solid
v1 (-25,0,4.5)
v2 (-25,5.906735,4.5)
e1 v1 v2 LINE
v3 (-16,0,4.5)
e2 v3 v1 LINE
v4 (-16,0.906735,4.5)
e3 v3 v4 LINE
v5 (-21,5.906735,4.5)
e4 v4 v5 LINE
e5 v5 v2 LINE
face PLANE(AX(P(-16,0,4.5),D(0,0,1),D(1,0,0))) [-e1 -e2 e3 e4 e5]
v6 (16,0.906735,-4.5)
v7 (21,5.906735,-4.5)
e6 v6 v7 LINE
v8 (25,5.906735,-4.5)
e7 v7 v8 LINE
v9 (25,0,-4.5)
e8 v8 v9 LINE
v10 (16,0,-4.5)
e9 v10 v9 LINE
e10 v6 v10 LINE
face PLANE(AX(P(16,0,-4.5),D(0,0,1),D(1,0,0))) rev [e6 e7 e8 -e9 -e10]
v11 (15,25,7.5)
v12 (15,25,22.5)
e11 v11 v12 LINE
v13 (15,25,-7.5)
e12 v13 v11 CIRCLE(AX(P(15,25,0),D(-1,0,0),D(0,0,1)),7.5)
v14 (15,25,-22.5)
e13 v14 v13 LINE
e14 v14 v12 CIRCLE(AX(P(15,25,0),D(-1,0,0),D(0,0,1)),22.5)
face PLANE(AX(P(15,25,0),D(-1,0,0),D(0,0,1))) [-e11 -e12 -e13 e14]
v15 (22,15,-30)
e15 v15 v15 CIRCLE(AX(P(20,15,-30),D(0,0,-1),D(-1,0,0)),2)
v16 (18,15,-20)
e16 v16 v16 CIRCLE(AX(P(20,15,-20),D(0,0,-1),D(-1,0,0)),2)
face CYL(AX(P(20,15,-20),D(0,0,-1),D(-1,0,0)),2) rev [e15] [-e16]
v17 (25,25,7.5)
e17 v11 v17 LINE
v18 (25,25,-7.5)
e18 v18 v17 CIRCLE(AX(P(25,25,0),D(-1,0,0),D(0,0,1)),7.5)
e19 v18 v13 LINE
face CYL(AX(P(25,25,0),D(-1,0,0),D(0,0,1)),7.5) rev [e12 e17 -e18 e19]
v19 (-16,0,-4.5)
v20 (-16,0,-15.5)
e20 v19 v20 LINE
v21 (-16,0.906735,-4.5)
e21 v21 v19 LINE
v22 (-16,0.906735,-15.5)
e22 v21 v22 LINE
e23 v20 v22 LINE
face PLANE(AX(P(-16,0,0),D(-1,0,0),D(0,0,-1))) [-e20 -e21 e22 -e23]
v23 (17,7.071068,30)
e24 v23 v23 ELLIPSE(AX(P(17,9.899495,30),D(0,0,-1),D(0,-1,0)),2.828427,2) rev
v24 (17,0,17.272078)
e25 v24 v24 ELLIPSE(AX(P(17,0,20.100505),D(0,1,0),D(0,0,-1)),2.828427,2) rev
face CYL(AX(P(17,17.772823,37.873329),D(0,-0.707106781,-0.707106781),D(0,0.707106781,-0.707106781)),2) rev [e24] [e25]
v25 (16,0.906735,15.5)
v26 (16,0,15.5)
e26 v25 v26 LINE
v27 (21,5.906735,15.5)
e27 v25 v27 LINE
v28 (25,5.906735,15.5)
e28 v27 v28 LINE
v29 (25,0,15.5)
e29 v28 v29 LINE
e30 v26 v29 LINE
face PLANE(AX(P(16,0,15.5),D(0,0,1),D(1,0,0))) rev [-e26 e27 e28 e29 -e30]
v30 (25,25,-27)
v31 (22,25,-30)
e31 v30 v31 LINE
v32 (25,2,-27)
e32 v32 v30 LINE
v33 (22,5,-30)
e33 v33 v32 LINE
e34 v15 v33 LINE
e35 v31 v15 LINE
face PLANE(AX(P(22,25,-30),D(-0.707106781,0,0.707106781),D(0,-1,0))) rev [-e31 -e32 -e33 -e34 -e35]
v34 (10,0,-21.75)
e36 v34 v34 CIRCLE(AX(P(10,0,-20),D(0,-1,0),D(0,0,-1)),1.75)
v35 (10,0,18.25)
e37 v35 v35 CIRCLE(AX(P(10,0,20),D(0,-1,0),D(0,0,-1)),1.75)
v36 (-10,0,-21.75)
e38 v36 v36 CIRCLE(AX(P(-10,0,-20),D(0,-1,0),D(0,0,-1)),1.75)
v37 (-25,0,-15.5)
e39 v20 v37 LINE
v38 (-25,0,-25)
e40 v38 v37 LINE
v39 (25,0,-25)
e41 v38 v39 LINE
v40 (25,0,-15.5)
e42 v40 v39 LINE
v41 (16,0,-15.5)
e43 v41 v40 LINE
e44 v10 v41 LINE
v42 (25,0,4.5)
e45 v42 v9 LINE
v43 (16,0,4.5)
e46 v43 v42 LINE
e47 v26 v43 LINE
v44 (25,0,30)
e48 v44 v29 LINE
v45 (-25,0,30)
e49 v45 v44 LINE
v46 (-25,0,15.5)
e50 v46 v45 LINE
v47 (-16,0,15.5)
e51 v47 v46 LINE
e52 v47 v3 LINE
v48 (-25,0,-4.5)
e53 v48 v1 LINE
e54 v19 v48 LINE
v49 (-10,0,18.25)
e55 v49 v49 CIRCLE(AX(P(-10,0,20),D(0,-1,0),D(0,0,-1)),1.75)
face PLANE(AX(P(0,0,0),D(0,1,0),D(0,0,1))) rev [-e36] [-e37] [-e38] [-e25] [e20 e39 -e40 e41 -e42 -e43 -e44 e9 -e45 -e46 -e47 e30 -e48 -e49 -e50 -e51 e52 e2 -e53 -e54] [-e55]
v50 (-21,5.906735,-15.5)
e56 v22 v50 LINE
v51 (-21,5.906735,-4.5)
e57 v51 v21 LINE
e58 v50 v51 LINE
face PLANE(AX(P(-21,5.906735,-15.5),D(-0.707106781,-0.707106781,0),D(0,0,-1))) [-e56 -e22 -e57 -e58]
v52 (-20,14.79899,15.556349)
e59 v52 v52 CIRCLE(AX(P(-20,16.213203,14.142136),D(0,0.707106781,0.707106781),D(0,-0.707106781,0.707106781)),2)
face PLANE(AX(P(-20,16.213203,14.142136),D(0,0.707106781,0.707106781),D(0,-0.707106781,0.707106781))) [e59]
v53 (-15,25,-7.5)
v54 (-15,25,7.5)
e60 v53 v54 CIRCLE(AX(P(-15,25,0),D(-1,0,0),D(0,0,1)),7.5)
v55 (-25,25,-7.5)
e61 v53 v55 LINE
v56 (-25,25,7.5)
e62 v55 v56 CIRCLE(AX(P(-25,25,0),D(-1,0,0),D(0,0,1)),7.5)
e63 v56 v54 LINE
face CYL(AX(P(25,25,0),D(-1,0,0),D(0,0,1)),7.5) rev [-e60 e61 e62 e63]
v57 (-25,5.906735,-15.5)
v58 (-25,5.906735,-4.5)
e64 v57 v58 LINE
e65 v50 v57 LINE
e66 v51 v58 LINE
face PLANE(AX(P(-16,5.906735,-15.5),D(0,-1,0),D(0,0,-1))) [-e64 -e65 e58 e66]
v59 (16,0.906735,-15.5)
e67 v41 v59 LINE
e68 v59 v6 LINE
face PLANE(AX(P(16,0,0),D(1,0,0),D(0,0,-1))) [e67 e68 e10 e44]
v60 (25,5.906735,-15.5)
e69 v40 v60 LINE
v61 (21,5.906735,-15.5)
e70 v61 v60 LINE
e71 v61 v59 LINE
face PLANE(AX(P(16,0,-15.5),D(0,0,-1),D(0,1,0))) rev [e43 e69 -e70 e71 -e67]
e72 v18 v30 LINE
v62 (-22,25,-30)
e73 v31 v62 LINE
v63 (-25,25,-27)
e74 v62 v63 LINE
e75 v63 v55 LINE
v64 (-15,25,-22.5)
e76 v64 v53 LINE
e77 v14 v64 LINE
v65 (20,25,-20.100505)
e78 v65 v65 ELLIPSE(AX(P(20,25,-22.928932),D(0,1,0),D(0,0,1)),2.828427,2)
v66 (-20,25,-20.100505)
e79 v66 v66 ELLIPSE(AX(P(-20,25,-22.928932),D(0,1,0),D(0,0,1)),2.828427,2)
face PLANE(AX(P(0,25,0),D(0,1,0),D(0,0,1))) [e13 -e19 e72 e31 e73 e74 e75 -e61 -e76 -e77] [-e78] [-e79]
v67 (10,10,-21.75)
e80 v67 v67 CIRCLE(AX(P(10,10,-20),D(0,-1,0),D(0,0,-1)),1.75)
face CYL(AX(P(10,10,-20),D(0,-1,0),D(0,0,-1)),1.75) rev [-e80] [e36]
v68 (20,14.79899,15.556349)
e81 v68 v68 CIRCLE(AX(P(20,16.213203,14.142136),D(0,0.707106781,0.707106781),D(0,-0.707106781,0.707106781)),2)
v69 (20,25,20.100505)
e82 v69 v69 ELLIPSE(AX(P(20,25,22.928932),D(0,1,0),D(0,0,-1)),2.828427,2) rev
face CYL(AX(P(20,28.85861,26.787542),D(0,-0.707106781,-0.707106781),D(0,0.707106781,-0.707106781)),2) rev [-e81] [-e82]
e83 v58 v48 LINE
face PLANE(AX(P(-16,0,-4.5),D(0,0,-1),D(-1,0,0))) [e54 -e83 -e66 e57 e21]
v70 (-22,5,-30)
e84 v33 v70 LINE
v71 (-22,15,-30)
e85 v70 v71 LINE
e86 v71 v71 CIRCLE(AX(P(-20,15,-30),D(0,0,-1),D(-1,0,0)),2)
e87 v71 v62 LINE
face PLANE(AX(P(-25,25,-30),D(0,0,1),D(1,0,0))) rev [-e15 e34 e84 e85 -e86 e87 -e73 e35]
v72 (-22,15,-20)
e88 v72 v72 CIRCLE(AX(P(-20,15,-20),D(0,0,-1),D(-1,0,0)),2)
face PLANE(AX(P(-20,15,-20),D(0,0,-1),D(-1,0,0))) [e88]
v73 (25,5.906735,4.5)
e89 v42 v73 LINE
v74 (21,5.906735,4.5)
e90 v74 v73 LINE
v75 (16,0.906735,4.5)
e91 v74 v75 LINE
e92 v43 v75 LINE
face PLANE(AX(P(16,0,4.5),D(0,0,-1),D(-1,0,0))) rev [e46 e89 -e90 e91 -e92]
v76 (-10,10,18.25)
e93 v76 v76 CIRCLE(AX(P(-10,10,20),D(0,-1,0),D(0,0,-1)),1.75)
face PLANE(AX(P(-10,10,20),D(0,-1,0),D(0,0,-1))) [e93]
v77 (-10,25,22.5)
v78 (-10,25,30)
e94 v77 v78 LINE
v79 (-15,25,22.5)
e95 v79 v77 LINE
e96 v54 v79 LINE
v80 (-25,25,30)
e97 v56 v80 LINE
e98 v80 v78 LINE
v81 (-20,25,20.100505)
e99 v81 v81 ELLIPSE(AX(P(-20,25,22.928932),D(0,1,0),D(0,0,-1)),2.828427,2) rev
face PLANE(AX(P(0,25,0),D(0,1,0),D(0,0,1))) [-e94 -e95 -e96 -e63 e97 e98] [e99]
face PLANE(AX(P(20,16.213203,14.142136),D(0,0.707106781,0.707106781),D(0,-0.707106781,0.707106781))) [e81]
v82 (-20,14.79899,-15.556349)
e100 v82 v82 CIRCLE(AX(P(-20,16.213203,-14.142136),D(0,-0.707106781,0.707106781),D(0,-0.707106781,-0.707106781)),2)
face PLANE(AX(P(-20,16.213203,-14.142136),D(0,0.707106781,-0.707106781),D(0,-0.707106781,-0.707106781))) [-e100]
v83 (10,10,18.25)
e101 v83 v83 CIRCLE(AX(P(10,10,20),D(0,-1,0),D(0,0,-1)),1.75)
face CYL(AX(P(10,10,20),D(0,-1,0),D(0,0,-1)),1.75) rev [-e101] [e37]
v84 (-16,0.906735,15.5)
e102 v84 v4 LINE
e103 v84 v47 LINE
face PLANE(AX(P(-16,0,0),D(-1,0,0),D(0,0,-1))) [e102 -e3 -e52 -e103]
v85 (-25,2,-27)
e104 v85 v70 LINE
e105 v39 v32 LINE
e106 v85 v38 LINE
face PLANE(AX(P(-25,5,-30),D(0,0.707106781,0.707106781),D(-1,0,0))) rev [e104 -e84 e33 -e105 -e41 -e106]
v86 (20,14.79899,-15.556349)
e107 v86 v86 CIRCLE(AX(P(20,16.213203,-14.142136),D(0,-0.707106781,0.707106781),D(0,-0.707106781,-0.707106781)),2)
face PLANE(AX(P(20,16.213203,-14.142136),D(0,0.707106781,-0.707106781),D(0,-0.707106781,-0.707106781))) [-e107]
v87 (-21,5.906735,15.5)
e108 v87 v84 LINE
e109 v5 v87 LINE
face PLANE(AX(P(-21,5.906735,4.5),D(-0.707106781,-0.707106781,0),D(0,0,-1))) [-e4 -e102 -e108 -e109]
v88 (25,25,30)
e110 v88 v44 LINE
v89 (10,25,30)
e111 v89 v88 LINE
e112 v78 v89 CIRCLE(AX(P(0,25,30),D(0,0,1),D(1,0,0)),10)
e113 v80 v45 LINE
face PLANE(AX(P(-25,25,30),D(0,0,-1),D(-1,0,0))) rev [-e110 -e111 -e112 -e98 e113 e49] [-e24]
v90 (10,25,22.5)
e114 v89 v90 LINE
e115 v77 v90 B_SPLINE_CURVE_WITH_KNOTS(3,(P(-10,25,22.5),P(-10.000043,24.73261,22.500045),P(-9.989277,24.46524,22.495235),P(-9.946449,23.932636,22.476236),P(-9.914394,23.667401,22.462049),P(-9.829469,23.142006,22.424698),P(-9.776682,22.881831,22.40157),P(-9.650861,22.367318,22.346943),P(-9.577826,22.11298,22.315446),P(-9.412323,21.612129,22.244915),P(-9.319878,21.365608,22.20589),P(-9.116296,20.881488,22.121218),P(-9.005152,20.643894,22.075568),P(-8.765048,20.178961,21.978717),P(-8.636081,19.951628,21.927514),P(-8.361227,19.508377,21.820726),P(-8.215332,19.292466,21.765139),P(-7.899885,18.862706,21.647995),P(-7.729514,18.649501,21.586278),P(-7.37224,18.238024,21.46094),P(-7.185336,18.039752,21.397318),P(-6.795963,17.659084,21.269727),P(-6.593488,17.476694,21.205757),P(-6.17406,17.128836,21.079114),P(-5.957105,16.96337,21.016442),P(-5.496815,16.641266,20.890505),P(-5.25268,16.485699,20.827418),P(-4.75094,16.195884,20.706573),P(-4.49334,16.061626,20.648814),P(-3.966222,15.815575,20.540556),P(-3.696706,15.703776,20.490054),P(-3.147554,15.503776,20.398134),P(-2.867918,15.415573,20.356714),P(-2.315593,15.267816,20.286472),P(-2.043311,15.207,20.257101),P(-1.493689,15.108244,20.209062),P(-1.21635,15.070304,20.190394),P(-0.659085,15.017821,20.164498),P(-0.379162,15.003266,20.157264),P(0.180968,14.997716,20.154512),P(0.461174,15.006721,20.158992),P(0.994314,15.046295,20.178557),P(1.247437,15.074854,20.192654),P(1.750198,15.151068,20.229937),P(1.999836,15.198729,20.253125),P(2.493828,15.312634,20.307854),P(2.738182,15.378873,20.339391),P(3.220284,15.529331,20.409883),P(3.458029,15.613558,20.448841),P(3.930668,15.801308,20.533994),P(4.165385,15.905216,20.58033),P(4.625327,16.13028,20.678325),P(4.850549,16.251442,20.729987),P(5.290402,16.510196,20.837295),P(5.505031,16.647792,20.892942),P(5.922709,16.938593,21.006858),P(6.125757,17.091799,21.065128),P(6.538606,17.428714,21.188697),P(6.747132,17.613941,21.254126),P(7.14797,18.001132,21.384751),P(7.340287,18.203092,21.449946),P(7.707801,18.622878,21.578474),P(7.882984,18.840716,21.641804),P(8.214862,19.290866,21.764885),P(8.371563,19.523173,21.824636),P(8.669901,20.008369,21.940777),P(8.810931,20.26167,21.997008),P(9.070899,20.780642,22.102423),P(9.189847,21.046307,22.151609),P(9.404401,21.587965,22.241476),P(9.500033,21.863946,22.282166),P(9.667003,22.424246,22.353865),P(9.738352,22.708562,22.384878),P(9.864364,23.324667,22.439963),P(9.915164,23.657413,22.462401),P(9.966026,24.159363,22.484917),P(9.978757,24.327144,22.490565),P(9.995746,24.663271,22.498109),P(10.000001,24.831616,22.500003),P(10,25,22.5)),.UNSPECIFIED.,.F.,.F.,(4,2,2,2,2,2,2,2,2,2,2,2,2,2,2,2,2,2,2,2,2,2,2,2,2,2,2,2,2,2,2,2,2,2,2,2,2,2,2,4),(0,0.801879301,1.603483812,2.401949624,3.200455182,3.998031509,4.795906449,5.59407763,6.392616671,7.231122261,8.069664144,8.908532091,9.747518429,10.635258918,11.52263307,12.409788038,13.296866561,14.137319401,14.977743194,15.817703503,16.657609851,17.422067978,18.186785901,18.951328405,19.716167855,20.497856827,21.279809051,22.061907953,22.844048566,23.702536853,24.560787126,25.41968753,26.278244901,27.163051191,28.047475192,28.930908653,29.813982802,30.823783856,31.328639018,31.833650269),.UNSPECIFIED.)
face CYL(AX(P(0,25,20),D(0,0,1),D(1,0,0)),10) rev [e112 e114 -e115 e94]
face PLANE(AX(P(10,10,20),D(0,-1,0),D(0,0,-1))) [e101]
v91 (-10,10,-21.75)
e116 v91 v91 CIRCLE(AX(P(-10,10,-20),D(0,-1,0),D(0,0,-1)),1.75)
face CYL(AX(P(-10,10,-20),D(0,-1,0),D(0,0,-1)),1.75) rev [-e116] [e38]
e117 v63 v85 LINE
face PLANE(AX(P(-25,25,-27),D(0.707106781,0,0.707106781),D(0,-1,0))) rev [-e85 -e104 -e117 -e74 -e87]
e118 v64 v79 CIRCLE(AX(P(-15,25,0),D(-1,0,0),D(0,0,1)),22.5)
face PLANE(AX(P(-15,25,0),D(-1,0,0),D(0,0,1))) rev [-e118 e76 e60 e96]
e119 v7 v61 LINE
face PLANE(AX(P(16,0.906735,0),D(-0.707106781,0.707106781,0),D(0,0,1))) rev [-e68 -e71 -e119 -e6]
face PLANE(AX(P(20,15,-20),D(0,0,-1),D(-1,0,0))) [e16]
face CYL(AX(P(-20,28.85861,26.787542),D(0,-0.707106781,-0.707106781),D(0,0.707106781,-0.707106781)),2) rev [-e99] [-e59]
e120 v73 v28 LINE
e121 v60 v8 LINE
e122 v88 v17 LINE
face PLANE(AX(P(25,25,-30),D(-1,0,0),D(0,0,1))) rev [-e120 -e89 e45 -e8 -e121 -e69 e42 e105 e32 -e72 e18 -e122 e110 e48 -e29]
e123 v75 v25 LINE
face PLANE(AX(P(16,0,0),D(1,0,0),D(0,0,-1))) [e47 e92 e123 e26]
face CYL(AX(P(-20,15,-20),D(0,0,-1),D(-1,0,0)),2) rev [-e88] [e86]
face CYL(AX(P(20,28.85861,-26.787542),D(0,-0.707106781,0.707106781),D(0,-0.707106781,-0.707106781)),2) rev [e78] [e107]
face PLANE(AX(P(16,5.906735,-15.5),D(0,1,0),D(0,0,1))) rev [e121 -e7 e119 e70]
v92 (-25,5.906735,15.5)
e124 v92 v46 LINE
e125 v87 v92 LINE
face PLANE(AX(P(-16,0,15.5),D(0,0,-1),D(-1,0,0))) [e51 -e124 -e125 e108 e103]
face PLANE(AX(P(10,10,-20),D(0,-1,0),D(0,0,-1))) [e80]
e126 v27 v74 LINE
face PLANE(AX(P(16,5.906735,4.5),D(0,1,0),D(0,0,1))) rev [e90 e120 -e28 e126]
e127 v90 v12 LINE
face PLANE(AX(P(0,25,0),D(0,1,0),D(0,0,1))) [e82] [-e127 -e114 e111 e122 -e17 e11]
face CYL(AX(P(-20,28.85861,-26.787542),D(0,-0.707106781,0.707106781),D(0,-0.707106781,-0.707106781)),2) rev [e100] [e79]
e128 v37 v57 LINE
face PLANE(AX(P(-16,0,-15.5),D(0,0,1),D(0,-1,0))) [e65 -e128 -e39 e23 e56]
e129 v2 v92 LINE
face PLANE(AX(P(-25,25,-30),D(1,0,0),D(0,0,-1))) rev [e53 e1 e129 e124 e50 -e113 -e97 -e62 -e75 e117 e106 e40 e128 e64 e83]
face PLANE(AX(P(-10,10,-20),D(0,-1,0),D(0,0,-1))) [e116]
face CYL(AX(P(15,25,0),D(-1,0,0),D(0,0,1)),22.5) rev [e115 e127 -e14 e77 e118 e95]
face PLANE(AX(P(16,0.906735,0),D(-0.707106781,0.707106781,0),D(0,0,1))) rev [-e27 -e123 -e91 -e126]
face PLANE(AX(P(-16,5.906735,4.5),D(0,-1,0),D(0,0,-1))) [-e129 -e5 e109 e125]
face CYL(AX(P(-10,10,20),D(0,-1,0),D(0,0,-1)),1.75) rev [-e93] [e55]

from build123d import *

# Parameters (mm, degrees)
SKETCH1_W                = 50
SKETCH1_H                = 60
BOSS_EXTRUDE1_DEPTH      = 25
CUT_EXTRUDE1_START       = -10
SKETCH2_R                = 22.5
CUT_EXTRUDE1_DEPTH       = 30
SKETCH3_R                = 7.5
CUT_EXTRUDE2_DEPTH       = 64.442887702
SKETCH4_R                = 10
CUT_EXTRUDE3_DEPTH       = 10
SKETCH5_R                = 1.75
CUT_EXTRUDE4_DEPTH       = 10
CHAMFER1_SIZE            = 5
SKETCH6_R                = 2
CUT_EXTRUDE5_DEPTH       = 10
SKETCH7_W                = 11
SKETCH7_H                = 5.906734889
CUT_EXTRUDE6_DEPTH       = 9
CHAMFER2_SIZE            = 5
CHAMFER2_OF_MIRROR1_SIZE = 5
CHAMFER3_SIZE            = 3
CUT_EXTRUDE8_START       = 25
SKETCH10_R               = 2
CUT_EXTRUDE8_DEPTH       = 25.371044267
SKETCH11_R               = 2
CUT_EXTRUDE9_DEPTH       = 50.371044267


with BuildPart() as part:
    # Sketch1 → Boss-Extrude1 (new body)
    with BuildSketch(Plane(origin=(0, 0, 0), x_dir=(1, 0, 0), z_dir=(0, 1, 0))):
        Rectangle(SKETCH1_W, SKETCH1_H)
    extrude(amount=BOSS_EXTRUDE1_DEPTH)

    # Sketch2 → Cut-Extrude1 (cut)
    with BuildSketch(Plane.ZY.offset(25).offset(CUT_EXTRUDE1_START)):
        with Locations((0, 25)):
            Circle(SKETCH2_R)
    extrude(amount=-CUT_EXTRUDE1_DEPTH, mode=Mode.SUBTRACT)

    # Sketch3 → Cut-Extrude2 (cut, through all)
    with BuildSketch(Plane.ZY.offset(25)):
        with Locations((0, 25)):
            Circle(SKETCH3_R)
    extrude(amount=-CUT_EXTRUDE2_DEPTH, mode=Mode.SUBTRACT)

    # Sketch4 → Cut-Extrude3 (cut)
    with BuildSketch(Plane.XY.offset(30)):
        with Locations((0, 25)):
            Circle(SKETCH4_R)
    extrude(amount=-CUT_EXTRUDE3_DEPTH, mode=Mode.SUBTRACT)

    # Sketch5 → Cut-Extrude4 (cut)
    with BuildSketch(Plane.XZ):
        with Locations(Location((-10, 20, 0), (0, 0, 270))):
            Circle(SKETCH5_R)
        with Locations(Location((10, 20, 0), (0, 0, 270))):
            Circle(SKETCH5_R)
        with Locations(Location((-10, -20, 0), (0, 0, 270))):
            Circle(SKETCH5_R)
        with Locations(Location((10, -20, 0), (0, 0, 270))):
            Circle(SKETCH5_R)
    extrude(amount=-CUT_EXTRUDE4_DEPTH, mode=Mode.SUBTRACT)

    # Chamfer1
    chamfer1_edges = [part.edges().sort_by_distance(p)[0] for p in [
        (0, 0, -30),
    ]]
    chamfer(chamfer1_edges, length=CHAMFER1_SIZE)

    # Sketch6 → Cut-Extrude5 (cut)
    with BuildSketch(Plane(origin=(0, 0, -30), x_dir=(-1, 0, 0), z_dir=(0, 0, -1))):
        with Locations((-20, 15)):
            Circle(SKETCH6_R)
        with Locations((20, 15)):
            Circle(SKETCH6_R)
    extrude(amount=-CUT_EXTRUDE5_DEPTH, mode=Mode.SUBTRACT)

    # Sketch7 → Cut-Extrude6 (cut)
    with BuildSketch(Plane(origin=(25, 0, 0), x_dir=(0, 0, -1), z_dir=(1, 0, 0))):
        with Locations((-10, 2.953367444)):
            Rectangle(SKETCH7_W, SKETCH7_H)
        with Locations((10, 2.953367444)):
            Rectangle(SKETCH7_W, SKETCH7_H)
    cut_extrude6 = extrude(amount=-CUT_EXTRUDE6_DEPTH, mode=Mode.SUBTRACT)

    # Chamfer2
    chamfer2_edges = [part.edges().sort_by_distance(p)[0] for p in [
        (16, 5.906734889, 10),
        (16, 5.906734889, -10),
    ]]
    chamfer(chamfer2_edges, length=CHAMFER2_SIZE)

    # Mirror1: Cut-Extrude6 across plane
    add(cut_extrude6.mirror(Plane(origin=(0, 0, 0), x_dir=(0, 0, 1), z_dir=(1, 0, 0))), mode=Mode.SUBTRACT)

    # Chamfer2 of Mirror1
    chamfer2_of_mirror1_edges = [part.edges().sort_by_distance(p)[0] for p in [
        (-16, 5.906734889, 10),
        (-16, 5.906734889, -10),
    ]]
    chamfer(chamfer2_of_mirror1_edges, length=CHAMFER2_OF_MIRROR1_SIZE)

    # Chamfer3
    chamfer3_edges = [part.edges().sort_by_distance(p)[0] for p in [
        (-25, 15, -30),
        (25, 15, -30),
    ]]
    chamfer(chamfer3_edges, length=CHAMFER3_SIZE - 0.0001)  # a hair under: the kernel refuses the full size

    # Sketch10 → Cut-Extrude8 (cut, through all)
    with BuildSketch(Plane(origin=(0, -2.5, -2.5), x_dir=(1, 0, 0), z_dir=(0, 0.7071067811865475, 0.7071067811865477)).offset(CUT_EXTRUDE8_START)):
        with Locations(Location((-20, 1.464466094, 0), (0, 0, 90))):
            Circle(SKETCH10_R)
        with Locations(Location((20, 1.464466094, 0), (0, 0, 90))):
            Circle(SKETCH10_R)
    cut_extrude8 = extrude(amount=CUT_EXTRUDE8_DEPTH, mode=Mode.SUBTRACT)

    # Mirror2: Cut-Extrude8 across plane
    add(cut_extrude8.mirror(Plane.XY), mode=Mode.SUBTRACT)

    # Sketch11 → Cut-Extrude9 (cut, through all)
    with BuildSketch(Plane(origin=(0, -2.5, -2.5), x_dir=(1, 0, 0), z_dir=(0, 0.7071067811865475, 0.7071067811865477))):
        with Locations(Location((17, -14.213203436, 0), (0, 0, 90))):
            Circle(SKETCH11_R)
    extrude(amount=CUT_EXTRUDE9_DEPTH, mode=Mode.SUBTRACT)


solid = part.part
